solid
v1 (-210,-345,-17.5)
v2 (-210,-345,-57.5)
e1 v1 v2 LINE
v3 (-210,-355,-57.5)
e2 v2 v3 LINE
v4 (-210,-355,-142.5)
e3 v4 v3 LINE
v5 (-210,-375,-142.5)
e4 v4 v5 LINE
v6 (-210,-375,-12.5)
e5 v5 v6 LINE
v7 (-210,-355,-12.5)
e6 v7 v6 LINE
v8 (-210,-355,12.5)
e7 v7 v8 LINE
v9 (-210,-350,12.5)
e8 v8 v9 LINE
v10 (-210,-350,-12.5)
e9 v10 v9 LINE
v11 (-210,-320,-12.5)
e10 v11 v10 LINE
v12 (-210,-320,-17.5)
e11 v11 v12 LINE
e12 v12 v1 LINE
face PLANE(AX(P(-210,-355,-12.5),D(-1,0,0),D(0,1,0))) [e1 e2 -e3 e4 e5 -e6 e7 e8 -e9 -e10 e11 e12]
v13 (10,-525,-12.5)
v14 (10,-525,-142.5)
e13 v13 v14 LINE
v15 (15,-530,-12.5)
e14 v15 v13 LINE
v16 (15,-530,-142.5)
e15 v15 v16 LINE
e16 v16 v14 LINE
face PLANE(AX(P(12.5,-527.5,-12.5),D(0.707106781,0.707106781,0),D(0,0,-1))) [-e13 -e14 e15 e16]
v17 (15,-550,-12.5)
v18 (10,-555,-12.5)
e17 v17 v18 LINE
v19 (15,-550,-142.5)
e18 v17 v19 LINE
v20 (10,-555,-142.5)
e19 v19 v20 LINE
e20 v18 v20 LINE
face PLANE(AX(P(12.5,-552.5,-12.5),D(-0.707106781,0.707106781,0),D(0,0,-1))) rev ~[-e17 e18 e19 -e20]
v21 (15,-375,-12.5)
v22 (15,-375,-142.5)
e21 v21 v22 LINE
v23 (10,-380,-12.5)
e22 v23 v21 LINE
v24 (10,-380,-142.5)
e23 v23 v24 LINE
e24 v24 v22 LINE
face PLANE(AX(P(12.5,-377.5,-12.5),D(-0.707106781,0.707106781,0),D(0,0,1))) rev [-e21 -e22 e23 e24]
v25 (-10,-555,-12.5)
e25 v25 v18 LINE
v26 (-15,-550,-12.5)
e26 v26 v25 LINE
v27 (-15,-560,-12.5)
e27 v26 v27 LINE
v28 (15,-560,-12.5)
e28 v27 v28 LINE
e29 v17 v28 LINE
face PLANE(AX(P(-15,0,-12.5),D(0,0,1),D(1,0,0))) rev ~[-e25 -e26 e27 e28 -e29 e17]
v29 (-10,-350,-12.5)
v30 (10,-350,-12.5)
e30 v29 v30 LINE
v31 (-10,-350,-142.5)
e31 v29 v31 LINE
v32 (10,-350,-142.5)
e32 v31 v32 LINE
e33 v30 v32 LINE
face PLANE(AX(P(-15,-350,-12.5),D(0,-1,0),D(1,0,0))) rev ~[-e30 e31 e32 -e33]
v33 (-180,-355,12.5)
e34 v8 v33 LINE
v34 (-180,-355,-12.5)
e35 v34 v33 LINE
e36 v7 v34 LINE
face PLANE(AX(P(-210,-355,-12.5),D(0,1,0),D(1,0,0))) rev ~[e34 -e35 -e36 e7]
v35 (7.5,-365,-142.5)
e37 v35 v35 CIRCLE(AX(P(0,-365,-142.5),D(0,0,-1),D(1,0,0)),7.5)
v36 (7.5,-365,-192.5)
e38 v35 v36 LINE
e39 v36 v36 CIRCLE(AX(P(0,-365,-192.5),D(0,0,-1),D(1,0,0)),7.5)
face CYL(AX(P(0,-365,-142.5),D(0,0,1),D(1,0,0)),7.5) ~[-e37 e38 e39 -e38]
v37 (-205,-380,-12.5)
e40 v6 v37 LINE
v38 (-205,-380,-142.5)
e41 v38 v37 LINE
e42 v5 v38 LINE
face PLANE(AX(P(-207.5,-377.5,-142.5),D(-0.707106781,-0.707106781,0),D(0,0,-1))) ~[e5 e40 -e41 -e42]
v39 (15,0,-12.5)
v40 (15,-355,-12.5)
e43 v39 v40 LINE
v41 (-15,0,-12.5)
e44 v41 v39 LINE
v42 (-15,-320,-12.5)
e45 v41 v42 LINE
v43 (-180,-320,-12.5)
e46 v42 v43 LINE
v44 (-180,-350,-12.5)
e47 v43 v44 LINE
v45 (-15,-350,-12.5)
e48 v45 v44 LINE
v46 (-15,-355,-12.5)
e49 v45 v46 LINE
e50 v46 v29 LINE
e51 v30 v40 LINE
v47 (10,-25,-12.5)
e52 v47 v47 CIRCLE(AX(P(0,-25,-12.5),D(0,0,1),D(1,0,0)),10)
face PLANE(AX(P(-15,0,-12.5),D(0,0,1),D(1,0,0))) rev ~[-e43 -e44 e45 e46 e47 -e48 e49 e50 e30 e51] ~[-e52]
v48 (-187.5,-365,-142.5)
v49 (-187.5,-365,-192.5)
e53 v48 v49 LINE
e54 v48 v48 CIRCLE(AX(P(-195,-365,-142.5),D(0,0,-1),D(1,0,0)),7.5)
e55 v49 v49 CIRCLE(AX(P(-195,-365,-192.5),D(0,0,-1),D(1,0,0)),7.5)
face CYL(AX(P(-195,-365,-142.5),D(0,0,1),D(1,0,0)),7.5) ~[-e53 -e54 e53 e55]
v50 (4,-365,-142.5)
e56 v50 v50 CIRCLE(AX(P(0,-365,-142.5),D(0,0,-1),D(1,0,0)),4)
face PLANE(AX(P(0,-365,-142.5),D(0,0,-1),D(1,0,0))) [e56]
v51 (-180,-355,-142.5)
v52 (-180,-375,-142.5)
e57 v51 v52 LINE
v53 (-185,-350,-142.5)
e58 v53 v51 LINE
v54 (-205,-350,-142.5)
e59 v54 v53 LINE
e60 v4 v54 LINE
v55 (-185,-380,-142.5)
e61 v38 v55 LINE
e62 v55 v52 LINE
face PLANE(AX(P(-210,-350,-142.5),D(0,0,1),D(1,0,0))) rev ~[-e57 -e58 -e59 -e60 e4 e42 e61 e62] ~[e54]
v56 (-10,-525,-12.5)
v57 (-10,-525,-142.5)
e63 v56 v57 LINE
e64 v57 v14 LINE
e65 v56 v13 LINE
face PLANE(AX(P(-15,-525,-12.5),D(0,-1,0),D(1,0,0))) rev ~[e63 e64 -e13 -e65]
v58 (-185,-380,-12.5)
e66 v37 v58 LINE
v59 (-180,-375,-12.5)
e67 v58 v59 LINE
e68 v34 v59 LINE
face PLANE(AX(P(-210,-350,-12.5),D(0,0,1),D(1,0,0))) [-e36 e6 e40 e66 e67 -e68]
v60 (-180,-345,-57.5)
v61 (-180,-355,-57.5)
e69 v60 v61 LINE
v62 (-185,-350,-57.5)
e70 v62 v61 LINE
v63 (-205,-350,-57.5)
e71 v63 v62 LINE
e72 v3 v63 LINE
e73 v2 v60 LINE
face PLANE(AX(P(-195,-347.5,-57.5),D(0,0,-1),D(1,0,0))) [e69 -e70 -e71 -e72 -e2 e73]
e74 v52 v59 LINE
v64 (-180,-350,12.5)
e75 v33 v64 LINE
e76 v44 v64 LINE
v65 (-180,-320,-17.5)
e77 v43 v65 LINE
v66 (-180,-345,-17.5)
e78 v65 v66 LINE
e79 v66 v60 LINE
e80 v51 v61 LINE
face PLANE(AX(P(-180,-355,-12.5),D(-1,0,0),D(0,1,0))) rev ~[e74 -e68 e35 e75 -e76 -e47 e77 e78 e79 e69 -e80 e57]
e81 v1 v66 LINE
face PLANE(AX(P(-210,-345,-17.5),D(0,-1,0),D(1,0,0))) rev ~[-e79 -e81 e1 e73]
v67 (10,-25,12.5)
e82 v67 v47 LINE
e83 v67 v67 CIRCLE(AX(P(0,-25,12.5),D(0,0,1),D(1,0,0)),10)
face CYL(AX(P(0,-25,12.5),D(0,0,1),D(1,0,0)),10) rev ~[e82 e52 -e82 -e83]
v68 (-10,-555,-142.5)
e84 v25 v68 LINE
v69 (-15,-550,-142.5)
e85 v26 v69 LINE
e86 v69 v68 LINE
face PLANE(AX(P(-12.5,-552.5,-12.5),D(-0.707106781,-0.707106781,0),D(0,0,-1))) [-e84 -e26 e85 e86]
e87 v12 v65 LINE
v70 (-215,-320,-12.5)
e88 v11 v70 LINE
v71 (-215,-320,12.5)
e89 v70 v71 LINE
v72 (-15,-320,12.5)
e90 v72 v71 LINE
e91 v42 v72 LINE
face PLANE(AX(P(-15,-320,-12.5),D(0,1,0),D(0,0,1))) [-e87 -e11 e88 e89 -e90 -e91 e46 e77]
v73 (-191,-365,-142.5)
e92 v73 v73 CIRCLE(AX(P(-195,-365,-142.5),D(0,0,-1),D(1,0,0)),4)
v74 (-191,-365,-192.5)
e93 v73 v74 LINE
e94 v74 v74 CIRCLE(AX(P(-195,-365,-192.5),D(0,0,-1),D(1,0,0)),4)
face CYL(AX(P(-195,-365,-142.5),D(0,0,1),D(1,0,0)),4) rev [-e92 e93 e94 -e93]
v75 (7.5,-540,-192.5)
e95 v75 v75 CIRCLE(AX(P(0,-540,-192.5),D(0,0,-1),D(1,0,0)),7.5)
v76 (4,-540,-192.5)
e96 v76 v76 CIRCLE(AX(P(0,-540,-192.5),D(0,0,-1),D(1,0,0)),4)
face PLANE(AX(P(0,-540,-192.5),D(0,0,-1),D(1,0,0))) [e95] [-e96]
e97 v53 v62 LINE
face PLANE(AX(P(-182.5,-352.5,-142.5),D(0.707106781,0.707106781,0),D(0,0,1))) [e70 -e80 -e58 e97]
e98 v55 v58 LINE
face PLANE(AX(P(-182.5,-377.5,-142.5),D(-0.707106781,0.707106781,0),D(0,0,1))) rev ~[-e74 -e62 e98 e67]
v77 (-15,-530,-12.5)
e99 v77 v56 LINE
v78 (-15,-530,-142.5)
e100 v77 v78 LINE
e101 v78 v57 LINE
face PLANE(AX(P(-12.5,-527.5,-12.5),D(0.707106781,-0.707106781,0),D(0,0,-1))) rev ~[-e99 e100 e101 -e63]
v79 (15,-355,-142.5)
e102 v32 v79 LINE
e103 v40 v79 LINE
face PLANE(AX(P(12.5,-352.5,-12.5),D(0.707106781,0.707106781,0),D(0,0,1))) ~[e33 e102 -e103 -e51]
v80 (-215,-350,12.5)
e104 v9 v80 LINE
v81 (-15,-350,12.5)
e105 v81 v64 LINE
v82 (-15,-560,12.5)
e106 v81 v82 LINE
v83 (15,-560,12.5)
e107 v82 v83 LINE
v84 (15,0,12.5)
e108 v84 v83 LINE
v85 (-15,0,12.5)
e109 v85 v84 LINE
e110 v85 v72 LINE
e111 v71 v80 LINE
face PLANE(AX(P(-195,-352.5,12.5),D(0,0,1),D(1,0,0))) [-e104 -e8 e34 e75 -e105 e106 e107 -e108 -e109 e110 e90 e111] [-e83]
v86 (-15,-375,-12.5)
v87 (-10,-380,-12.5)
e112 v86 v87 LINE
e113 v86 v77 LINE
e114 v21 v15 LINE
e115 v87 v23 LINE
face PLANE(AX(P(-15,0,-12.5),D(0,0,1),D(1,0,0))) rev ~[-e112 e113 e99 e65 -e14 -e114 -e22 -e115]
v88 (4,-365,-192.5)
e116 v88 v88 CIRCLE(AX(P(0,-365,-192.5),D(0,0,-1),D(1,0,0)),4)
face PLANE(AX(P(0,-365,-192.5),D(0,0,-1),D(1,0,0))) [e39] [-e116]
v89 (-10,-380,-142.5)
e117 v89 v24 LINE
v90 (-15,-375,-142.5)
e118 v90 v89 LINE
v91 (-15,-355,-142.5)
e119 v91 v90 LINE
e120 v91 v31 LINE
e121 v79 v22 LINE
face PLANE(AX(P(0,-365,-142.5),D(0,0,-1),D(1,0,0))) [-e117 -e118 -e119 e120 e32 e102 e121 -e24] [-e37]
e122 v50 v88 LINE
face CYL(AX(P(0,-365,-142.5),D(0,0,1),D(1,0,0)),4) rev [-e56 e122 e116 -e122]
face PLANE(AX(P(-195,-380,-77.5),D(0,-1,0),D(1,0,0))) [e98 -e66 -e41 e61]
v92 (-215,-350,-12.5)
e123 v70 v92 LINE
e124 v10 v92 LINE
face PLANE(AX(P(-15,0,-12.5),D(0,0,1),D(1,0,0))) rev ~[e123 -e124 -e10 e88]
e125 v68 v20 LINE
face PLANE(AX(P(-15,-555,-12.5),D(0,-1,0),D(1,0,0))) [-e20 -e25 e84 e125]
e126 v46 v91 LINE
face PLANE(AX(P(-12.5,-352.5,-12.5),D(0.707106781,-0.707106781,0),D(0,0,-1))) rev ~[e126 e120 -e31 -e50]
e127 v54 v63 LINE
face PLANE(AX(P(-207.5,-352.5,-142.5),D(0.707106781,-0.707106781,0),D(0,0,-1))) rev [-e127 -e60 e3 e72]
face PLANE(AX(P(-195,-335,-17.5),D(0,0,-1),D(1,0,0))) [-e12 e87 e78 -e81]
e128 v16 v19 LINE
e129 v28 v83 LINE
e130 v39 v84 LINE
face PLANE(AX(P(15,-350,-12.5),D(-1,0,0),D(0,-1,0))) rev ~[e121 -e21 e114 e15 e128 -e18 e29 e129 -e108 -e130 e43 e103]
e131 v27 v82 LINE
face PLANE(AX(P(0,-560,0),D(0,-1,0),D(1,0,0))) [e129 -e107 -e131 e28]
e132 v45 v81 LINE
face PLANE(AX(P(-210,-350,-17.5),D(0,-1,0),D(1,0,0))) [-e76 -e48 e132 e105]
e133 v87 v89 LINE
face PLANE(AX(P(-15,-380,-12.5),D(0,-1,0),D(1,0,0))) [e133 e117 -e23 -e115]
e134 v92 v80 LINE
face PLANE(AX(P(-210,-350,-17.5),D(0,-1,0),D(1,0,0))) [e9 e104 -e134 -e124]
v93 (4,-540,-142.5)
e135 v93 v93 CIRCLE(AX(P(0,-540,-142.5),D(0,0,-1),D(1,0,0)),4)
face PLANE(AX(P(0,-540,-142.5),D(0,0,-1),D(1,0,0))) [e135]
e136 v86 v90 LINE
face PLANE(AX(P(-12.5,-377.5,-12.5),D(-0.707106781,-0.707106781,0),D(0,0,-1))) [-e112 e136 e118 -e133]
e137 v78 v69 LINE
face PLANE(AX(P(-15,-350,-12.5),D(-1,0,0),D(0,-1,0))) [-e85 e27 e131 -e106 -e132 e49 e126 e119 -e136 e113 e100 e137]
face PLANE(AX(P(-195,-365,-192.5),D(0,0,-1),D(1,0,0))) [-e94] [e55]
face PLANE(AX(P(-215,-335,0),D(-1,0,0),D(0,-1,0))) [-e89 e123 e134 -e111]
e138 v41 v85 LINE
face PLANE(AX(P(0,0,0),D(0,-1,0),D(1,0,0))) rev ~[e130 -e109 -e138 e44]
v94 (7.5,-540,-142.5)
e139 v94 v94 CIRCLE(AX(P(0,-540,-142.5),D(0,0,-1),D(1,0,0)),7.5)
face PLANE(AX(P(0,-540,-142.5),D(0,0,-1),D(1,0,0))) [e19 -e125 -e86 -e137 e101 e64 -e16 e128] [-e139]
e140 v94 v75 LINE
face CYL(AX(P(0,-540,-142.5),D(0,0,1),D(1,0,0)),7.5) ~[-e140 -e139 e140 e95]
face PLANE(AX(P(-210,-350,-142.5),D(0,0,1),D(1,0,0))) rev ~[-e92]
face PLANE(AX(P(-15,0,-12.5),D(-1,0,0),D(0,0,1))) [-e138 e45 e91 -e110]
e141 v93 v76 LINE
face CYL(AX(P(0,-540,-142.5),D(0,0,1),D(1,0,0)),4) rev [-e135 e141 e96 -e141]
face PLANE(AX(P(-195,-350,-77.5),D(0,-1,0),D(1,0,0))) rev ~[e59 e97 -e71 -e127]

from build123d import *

# Parameters (mm, degrees)
F0_W      = 30
F0_H      = 25
F1_DEPTH  = 560
F2_W      = 30
F2_H      = 25
F3_DEPTH  = 200
F4_R      = 10
F5_DEPTH  = 25
F6_W      = 30
F6_H      = 30
F7_DEPTH  = 130
F8_SIZE   = 5
F9_R      = 7.5
F9_R_2    = 4
F10_DEPTH = 50
F12_R     = 7.5
F12_R_2   = 4
F13_DEPTH = 50
F14_W     = 30
F14_H     = 30
F15_DEPTH = 5
F16_W     = 30
F16_H     = 5
F17_DEPTH = 40
F18_W     = 30
F18_H     = 130
F19_DEPTH = 30
F20_SIZE  = 5
F21_R     = 7.5
F21_R_2   = 4
F22_DEPTH = 50
F23_W     = 30
F23_H     = 5
F24_DEPTH = 25


# Not quite as in the source:
# - two fillets or chamfers of one size are made in one step


with BuildPart() as f1:
    # F0 (on Front) → F1 (new body)
    with BuildSketch(Plane.XZ):
        Rectangle(F0_W, F0_H)
    extrude(amount=F1_DEPTH)

    # F2 (on face) → F3 (join)
    with BuildSketch(Plane(origin=(-15, 0, 0), x_dir=(0, -1, 0), z_dir=(-1, 0, 0))):
        with Locations((335, 0)):
            Rectangle(F2_W, F2_H)
    extrude(amount=F3_DEPTH)

    # F4 (on face) → F5 (cut)
    with BuildSketch(Plane.XY.offset(12.5)):
        with Locations((0, -25)):
            Circle(F4_R)
    extrude(amount=-F5_DEPTH, mode=Mode.SUBTRACT)

    # F6 (on face) → F7 (join)
    with BuildSketch(Plane(origin=(0, 0, -12.5), x_dir=(1, 0, 0), z_dir=(0, 0, -1))):
        with Locations((0, 540)):
            Rectangle(F6_W, F6_H)
        with Locations((0, 365)):
            Rectangle(F6_W, F6_H)
    extrude(amount=F7_DEPTH)

    # F8
    f8_edges = [f1.edges().sort_by_distance(p)[0] for p in [
        (-15, -555, -77.5),
        (15, -555, -77.5),
        (15, -525, -77.5),
        (-15, -525, -77.5),
        (15, -350, -77.5),
        (15, -380, -77.5),
        (-15, -350, -77.5),
        (-15, -380, -77.5),
    ]]
    chamfer(f8_edges, length=F8_SIZE)

    # F9 (on face) → F10 (join)
    with BuildSketch(Plane(origin=(0, 0, -142.5), x_dir=(1, 0, 0), z_dir=(0, 0, -1))):
        with Locations((0, 540)):
            Circle(F9_R)
        with Locations((0, 540)):
            Circle(F9_R_2, mode=Mode.SUBTRACT)
    extrude(amount=F10_DEPTH)

    # F12 (on face) → F13 (join)
    with BuildSketch(Plane(origin=(0, 0, -142.5), x_dir=(1, 0, 0), z_dir=(0, 0, -1))):
        with Locations((0, 365)):
            Circle(F12_R)
        with Locations((0, 365)):
            Circle(F12_R_2, mode=Mode.SUBTRACT)
    extrude(amount=F13_DEPTH)

    # F14 (on face) → F15 (join)
    with BuildSketch(Plane(origin=(0, 0, -12.5), x_dir=(1, 0, 0), z_dir=(0, 0, -1))):
        with Locations((-195, 335)):
            Rectangle(F14_W, F14_H)
    extrude(amount=F15_DEPTH)

    # F16 (on face) → F17 (join)
    with BuildSketch(Plane(origin=(0, 0, -17.5), x_dir=(1, 0, 0), z_dir=(0, 0, -1))):
        with Locations((-195, 347.5)):
            Rectangle(F16_W, F16_H)
    extrude(amount=F17_DEPTH)

    # F18 (on face) → F19 (join)
    with BuildSketch(Plane.XZ.offset(350)):
        with Locations((-195, -77.5)):
            Rectangle(F18_W, F18_H)
    extrude(amount=F19_DEPTH)

    # F20
    f20_edges = [f1.edges().sort_by_distance(p)[0] for p in [
        (-210, -380, -77.5),
        (-180, -380, -77.5),
        (-180, -350, -100),
        (-210, -350, -100),
    ]]
    chamfer(f20_edges, length=F20_SIZE)

    # F21 (on face) → F22 (join)
    with BuildSketch(Plane(origin=(0, 0, -142.5), x_dir=(1, 0, 0), z_dir=(0, 0, -1))):
        with Locations((-195, 365)):
            Circle(F21_R)
        with Locations((-195, 365)):
            Circle(F21_R_2, mode=Mode.SUBTRACT)
    extrude(amount=F22_DEPTH)

    # F23 (on face) → F24 (join)
    with BuildSketch(Plane.XY.offset(-12.5)):
        with Locations((-195, -352.5)):
            Rectangle(F23_W, F23_H)
    extrude(amount=F24_DEPTH)


solid = f1.part
